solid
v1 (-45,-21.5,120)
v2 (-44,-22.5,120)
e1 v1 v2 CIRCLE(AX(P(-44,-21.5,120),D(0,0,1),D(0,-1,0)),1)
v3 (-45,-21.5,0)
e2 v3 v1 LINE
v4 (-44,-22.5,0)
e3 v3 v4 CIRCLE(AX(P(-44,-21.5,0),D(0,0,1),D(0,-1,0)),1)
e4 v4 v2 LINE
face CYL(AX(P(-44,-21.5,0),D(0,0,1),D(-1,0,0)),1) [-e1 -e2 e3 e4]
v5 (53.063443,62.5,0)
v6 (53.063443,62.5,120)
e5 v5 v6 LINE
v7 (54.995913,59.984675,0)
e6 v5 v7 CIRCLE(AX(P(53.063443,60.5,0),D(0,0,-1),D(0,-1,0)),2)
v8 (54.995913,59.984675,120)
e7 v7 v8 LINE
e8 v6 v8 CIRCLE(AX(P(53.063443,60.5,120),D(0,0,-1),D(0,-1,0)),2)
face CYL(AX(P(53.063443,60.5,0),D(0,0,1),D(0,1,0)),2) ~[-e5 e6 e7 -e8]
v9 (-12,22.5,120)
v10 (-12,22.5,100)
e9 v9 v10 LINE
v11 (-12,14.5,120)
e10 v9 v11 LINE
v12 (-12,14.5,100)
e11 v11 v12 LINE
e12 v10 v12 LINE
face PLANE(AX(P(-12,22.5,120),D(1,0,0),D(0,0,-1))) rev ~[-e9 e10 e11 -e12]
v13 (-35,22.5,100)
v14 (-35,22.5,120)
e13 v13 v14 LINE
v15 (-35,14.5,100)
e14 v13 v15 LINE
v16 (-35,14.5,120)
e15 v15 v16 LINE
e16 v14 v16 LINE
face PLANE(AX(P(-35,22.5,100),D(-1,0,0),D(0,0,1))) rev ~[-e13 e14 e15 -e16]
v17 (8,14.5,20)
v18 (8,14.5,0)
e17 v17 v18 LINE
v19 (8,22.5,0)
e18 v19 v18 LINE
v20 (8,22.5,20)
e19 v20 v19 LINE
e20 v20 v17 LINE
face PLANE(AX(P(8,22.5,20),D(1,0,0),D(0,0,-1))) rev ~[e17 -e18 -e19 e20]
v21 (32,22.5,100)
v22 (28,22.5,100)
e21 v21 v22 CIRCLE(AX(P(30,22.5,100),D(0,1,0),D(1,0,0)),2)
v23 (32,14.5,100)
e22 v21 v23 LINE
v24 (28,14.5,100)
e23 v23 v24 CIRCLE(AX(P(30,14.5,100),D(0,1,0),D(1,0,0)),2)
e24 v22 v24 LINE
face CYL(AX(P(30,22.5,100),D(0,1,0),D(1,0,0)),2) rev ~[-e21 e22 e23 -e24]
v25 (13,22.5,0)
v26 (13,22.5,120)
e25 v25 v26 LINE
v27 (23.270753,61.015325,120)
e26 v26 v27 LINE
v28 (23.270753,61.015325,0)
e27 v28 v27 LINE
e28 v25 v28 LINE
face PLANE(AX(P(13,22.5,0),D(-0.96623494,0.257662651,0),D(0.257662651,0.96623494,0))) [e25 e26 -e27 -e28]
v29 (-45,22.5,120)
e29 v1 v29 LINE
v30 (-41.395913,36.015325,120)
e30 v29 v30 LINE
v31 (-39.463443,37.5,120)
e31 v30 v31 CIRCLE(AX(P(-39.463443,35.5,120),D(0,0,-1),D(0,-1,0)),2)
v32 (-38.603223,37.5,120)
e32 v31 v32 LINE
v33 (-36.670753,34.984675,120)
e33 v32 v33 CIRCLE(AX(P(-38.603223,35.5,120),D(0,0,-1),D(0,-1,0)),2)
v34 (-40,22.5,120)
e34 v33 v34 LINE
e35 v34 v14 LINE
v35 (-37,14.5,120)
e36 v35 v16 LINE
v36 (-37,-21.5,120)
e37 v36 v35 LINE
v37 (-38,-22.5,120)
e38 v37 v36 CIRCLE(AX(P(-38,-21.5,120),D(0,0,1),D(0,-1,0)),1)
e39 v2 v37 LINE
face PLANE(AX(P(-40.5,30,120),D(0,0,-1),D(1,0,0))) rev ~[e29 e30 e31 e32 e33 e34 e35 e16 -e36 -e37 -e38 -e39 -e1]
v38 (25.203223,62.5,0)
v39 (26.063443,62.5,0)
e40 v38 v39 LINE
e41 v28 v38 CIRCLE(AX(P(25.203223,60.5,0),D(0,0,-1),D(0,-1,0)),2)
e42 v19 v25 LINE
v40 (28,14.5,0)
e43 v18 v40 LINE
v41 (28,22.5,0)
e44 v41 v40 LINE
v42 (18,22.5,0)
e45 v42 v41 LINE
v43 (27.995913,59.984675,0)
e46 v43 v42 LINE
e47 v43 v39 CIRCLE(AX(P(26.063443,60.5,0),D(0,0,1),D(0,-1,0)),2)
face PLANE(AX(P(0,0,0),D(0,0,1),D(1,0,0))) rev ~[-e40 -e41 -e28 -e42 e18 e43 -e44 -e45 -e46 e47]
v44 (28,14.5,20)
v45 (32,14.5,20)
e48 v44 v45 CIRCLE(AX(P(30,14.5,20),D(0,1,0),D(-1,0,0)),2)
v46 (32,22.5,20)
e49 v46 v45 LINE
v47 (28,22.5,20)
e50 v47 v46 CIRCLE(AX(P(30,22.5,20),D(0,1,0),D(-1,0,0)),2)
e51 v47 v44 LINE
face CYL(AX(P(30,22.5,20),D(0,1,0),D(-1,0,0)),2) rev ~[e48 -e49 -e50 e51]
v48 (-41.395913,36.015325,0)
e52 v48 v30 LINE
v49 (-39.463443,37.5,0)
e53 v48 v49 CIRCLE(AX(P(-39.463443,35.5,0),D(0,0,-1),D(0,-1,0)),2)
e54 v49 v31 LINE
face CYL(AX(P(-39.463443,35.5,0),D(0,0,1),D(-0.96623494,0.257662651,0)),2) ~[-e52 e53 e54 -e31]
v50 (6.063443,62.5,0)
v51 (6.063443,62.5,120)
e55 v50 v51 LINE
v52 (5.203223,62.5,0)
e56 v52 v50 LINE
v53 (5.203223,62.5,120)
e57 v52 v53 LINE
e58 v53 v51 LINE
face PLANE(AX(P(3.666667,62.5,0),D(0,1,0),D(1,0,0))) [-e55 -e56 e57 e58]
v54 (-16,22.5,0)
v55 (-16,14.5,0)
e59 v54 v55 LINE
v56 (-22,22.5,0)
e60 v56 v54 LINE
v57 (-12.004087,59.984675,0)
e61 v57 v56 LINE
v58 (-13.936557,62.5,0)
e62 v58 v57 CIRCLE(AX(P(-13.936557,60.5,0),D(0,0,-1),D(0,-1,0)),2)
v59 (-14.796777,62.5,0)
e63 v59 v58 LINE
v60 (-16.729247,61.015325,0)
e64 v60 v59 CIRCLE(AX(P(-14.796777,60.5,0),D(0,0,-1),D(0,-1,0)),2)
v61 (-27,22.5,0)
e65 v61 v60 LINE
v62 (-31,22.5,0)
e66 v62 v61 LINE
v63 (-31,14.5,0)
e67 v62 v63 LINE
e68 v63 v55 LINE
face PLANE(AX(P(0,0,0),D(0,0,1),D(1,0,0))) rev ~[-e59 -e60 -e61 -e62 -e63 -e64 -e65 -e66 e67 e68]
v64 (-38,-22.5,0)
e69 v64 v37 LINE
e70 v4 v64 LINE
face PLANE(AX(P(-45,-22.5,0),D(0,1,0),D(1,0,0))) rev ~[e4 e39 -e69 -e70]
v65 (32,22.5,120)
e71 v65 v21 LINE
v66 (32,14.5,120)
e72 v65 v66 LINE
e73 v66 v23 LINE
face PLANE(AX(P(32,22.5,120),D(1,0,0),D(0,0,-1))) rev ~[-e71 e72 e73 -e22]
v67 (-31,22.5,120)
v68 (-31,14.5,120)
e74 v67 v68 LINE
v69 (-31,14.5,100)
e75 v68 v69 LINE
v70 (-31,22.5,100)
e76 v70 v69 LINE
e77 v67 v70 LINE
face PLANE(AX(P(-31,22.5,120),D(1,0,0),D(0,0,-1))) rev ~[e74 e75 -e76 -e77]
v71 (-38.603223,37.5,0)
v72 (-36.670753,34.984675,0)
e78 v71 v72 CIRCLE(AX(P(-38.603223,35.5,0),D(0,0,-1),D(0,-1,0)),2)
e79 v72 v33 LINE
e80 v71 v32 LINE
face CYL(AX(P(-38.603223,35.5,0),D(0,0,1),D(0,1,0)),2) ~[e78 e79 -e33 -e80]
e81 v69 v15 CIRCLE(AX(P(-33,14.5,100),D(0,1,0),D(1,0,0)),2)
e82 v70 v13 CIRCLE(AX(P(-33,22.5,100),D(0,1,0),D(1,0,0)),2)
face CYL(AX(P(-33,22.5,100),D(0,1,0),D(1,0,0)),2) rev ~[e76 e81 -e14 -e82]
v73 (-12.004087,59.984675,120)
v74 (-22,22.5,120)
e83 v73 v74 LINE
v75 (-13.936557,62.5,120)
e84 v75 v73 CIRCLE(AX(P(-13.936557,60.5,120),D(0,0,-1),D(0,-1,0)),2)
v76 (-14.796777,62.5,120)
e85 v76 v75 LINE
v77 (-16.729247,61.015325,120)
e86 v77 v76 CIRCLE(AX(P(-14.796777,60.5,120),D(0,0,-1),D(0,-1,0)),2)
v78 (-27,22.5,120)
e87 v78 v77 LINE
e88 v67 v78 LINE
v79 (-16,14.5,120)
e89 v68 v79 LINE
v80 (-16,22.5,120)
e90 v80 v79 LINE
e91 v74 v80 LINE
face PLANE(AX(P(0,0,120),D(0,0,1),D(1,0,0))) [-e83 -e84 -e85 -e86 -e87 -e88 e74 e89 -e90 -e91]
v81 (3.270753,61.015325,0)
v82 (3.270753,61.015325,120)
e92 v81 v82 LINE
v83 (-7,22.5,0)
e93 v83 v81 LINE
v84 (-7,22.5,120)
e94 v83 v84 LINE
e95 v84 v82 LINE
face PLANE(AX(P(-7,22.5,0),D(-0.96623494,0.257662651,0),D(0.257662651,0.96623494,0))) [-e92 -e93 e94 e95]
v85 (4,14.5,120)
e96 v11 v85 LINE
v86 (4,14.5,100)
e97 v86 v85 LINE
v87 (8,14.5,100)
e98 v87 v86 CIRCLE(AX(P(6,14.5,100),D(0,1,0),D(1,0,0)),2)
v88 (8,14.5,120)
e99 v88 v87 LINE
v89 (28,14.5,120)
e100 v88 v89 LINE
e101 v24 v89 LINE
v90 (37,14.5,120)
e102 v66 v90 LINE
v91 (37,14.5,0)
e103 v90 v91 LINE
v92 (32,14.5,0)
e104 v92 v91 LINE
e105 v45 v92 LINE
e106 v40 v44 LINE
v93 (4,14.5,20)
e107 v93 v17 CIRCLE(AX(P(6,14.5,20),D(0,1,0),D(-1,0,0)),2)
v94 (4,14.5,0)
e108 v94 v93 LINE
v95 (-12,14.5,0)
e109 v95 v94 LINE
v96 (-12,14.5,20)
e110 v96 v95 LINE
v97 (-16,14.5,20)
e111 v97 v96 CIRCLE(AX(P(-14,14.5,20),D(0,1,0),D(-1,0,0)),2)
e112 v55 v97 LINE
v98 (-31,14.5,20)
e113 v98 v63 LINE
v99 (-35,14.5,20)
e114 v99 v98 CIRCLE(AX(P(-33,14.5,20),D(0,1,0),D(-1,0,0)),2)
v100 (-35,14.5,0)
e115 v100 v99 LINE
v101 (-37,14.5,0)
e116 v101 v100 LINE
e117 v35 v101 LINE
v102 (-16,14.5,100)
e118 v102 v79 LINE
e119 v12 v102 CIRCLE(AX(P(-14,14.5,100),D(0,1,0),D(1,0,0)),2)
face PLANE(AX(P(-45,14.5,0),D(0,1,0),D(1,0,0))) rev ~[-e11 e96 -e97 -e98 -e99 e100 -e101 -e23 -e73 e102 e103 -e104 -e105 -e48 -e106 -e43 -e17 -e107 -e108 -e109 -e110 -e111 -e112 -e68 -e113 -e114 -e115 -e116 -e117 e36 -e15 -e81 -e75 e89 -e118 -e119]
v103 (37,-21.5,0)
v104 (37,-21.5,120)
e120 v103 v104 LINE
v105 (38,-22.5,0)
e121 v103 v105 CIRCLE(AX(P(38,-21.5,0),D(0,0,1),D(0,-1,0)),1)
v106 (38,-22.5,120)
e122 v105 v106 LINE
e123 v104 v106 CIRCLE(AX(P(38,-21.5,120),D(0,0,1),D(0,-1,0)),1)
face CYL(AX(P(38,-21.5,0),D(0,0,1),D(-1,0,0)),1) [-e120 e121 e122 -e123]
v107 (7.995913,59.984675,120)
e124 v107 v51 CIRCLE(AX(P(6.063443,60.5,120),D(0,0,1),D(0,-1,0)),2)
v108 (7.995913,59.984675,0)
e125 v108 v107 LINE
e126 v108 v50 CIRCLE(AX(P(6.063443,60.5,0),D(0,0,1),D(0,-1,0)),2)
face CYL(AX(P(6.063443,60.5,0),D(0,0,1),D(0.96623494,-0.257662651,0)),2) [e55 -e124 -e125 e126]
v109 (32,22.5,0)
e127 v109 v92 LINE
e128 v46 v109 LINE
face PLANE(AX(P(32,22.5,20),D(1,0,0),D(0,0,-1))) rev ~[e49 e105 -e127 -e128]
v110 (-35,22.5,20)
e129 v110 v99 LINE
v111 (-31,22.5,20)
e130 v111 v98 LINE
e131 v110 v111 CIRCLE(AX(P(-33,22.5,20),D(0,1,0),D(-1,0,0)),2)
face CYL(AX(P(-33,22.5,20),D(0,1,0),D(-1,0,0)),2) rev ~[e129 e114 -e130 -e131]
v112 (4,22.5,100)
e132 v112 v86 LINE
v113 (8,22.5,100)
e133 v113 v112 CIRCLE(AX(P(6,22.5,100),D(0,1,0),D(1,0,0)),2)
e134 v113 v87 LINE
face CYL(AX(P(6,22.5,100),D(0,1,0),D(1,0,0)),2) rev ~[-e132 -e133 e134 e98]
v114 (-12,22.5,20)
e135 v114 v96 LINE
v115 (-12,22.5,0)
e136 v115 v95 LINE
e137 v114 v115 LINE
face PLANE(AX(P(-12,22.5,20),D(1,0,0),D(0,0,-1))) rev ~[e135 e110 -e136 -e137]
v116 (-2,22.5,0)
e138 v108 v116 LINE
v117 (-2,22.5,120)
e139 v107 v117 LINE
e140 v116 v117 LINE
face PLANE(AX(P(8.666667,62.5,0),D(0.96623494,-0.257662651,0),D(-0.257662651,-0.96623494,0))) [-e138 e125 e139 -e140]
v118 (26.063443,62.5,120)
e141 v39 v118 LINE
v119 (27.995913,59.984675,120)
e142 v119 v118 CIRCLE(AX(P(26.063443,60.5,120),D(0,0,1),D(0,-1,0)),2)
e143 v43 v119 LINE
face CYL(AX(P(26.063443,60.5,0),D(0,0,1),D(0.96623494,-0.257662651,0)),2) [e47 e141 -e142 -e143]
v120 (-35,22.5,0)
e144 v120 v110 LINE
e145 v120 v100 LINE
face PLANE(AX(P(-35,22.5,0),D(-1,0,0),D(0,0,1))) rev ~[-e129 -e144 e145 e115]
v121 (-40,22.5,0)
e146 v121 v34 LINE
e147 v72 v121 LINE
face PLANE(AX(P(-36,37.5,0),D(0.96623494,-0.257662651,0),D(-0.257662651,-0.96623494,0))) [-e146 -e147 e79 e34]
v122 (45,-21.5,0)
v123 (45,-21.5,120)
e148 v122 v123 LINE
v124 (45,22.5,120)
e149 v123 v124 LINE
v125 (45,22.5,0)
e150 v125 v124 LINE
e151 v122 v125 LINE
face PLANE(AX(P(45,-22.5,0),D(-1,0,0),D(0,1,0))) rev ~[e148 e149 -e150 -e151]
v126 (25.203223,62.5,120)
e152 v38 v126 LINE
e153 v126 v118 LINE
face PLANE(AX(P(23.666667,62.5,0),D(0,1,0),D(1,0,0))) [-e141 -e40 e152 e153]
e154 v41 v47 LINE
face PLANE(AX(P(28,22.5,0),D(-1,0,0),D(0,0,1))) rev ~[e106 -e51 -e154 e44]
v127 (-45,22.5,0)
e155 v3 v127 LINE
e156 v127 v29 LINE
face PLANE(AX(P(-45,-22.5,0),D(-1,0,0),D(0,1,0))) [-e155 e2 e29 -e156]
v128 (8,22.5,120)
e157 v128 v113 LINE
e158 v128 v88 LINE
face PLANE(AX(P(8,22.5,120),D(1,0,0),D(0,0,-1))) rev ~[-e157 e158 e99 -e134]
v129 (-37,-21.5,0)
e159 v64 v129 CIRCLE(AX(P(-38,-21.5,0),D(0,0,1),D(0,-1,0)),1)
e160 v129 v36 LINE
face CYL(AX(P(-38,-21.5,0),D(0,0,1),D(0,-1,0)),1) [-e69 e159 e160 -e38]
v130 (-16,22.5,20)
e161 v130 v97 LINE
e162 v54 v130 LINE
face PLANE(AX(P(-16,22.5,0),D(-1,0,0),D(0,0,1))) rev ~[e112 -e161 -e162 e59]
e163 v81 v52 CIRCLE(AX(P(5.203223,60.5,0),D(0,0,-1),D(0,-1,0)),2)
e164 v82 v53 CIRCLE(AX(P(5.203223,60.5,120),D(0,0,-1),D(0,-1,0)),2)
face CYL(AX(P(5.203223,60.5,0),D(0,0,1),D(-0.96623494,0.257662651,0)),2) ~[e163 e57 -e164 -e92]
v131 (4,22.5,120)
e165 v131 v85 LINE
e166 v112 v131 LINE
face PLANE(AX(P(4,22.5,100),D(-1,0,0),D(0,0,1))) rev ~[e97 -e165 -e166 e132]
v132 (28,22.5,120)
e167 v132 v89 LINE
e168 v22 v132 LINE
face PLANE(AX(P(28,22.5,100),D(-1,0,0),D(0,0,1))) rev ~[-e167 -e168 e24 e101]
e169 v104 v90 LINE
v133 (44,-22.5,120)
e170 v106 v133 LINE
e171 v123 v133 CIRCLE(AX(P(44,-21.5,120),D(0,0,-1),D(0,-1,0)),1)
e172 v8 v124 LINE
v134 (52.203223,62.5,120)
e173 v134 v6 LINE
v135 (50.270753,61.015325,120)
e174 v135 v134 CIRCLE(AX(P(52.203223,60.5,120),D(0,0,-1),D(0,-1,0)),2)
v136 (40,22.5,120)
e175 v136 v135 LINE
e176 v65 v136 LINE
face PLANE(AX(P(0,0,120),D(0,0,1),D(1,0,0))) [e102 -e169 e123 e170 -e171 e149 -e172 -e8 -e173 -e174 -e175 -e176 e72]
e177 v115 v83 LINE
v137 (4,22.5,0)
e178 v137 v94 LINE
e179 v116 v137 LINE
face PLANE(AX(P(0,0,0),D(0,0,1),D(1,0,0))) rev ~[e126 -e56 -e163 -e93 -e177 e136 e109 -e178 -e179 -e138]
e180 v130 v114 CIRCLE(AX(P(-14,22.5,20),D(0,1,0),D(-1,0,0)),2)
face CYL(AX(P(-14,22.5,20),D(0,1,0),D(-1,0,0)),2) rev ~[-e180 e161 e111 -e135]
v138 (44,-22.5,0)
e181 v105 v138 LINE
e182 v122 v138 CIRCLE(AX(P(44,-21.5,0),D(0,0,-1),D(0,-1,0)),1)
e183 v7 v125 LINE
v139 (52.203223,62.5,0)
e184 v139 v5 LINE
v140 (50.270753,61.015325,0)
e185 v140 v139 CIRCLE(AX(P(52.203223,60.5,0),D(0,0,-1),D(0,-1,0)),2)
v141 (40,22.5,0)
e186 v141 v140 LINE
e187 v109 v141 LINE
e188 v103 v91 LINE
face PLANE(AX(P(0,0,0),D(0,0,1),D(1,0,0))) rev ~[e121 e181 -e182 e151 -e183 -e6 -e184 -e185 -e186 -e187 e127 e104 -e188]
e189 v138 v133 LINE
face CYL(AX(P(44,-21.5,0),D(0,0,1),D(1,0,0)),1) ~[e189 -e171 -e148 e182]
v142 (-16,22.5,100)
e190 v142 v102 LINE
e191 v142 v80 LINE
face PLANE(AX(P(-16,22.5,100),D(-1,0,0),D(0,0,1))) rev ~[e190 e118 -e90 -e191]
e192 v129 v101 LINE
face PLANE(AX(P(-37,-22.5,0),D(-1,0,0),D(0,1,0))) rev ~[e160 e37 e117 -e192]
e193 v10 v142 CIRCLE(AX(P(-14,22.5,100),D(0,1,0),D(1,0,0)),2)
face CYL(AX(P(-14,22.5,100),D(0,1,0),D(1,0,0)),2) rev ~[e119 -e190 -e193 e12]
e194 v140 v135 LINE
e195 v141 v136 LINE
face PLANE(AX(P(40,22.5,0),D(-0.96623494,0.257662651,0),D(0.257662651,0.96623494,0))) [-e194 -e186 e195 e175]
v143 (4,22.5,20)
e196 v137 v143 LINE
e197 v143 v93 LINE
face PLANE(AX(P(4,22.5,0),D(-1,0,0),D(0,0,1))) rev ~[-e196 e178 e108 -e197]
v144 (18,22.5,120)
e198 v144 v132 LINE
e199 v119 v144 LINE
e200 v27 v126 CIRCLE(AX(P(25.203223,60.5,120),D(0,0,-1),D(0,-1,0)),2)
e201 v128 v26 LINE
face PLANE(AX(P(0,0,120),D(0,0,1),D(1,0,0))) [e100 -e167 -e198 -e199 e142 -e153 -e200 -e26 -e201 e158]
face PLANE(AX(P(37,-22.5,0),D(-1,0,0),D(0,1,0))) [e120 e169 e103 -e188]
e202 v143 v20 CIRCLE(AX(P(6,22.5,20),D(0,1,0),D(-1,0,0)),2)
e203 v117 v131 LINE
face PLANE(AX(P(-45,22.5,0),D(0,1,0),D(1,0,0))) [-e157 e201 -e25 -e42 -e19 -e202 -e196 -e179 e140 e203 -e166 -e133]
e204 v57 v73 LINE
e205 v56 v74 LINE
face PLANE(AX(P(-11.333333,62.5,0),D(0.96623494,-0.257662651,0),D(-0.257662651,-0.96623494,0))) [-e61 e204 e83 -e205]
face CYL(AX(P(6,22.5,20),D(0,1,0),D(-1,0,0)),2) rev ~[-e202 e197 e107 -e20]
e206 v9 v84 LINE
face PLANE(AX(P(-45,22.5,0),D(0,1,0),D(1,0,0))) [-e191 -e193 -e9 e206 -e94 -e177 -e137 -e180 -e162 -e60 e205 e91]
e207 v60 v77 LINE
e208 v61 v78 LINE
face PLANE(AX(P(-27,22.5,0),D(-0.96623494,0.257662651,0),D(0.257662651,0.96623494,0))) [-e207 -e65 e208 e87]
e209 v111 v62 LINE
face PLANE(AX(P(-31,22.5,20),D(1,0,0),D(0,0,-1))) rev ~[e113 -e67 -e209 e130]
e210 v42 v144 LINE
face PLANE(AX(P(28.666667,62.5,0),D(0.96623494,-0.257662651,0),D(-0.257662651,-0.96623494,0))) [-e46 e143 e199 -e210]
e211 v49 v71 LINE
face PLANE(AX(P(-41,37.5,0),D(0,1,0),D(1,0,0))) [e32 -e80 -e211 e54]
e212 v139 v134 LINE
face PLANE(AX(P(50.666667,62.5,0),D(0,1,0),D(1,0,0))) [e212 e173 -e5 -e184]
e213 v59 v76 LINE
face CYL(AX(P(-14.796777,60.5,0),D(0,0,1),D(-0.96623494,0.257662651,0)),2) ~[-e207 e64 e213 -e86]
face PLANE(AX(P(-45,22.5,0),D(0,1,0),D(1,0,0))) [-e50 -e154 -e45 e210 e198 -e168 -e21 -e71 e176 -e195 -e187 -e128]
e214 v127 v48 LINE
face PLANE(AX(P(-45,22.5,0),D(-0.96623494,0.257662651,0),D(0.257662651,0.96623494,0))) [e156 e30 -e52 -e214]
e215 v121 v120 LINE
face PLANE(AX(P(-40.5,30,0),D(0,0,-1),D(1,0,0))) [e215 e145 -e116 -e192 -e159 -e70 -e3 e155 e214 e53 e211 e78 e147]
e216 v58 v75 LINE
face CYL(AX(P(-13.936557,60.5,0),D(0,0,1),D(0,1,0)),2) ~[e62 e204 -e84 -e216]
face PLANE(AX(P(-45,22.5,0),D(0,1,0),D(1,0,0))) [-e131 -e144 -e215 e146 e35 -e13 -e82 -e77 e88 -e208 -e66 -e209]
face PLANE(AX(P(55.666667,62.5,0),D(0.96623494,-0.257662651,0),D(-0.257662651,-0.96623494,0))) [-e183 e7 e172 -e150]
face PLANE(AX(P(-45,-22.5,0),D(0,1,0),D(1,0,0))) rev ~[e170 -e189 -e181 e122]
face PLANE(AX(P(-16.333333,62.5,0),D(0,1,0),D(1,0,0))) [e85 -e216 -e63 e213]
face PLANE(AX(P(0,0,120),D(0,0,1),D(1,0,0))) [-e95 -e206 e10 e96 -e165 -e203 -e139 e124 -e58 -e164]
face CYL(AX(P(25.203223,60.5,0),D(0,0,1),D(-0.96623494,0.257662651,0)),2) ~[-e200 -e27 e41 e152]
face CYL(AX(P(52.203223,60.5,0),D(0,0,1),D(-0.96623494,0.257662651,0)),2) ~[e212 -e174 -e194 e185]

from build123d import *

# Parameters (mm, degrees)
F0_W     = 90
F0_H     = 45
F1_DEPTH = 120
F2_T     = -8
F4_DEPTH = 8
F6_DEPTH = 120
F7_R     = 2
F8_R     = 1


# Not quite as in the source:
# - a feature names something its author has since deleted; it is built from what else it names


with BuildPart() as f1:
    # F0 (on Top) → F1 (new body)
    with BuildSketch(Plane.XY):
        Rectangle(F0_W, F0_H)
    extrude(amount=F1_DEPTH)

    # F2
    f2_openings = [f1.faces().sort_by_distance(p)[0] for p in [
        (0, 0, 120),
        (0, -22.5, 60),
        (0, 0, 0),
    ]]
    offset(amount=F2_T, openings=f2_openings)

    # F3 (on face) → F4 (cut, through all)
    with BuildSketch(Plane(origin=(0, 22.5, 0), x_dir=(-1, 0, 0), z_dir=(0, 1, 0))):
        with BuildLine():
            Line((-32, 20), (-32, 0))
            Line((-32, 0), (-28, 0))
            Line((-28, 0), (-28, 20))
            ThreePointArc((-28, 20), (-30, 22), (-32, 20))
        make_face()
        with BuildLine():
            Line((-8, 20), (-8, 0))
            Line((-8, 0), (-4, 0))
            Line((-4, 0), (-4, 20))
            ThreePointArc((-4, 20), (-6, 22), (-8, 20))
        make_face()
        with BuildLine():
            Line((12, 20), (12, 0))
            Line((12, 0), (16, 0))
            Line((16, 0), (16, 20))
            ThreePointArc((16, 20), (14, 22), (12, 20))
        make_face()
        with BuildLine():
            Line((31, 20), (31, 0))
            Line((31, 0), (35, 0))
            Line((35, 0), (35, 20))
            ThreePointArc((35, 20), (33, 22), (31, 20))
        make_face()
        with BuildLine():
            Line((35, 120), (31, 120))
            Line((31, 120), (31, 100))
            ThreePointArc((31, 100), (33, 98), (35, 100))
            Line((35, 100), (35, 120))
        make_face()
        with BuildLine():
            Line((16, 120), (12, 120))
            Line((12, 120), (12, 100))
            ThreePointArc((12, 100), (14, 98), (16, 100))
            Line((16, 100), (16, 120))
        make_face()
        with BuildLine():
            Line((-4, 120), (-8, 120))
            Line((-8, 120), (-8, 100))
            ThreePointArc((-8, 100), (-6, 98), (-4, 100))
            Line((-4, 100), (-4, 120))
        make_face()
        with BuildLine():
            Line((-28, 120), (-32, 120))
            Line((-32, 120), (-32, 100))
            ThreePointArc((-32, 100), (-30, 98), (-28, 100))
            Line((-28, 100), (-28, 120))
        make_face()
    extrude(amount=-F4_DEPTH, mode=Mode.SUBTRACT)

    # F5 (on face) → F6 (join, through all)
    with BuildSketch(Plane(origin=(0, 0, 0), x_dir=(1, 0, 0), z_dir=(0, 0, -1))):
        Polygon((-40, -22.5), (-45, -22.5), (-41, -37.5), (-36, -37.5), align=None)
        Polygon((-22, -22.5), (-27, -22.5), (-16.3333333333, -62.5), (-11.3333333333, -62.5), align=None)
        Polygon((8.6666666667, -62.5), (-2, -22.5), (-7, -22.5), (3.6666666667, -62.5), align=None)
        Polygon((28.6666666667, -62.5), (18, -22.5), (13, -22.5), (23.6666666667, -62.5), align=None)
        Polygon((45, -22.5), (40, -22.5), (50.6666666667, -62.5), (55.6666666667, -62.5), align=None)
    extrude(amount=-F6_DEPTH)

    # F7
    f7_edges = [f1.edges().sort_by_distance(p)[0] for p in [
        (55.666667, 62.5, 60),
        (50.666667, 62.5, 60),
        (-16.333333, 62.5, 60),
        (3.666667, 62.5, 60),
        (-11.333333, 62.5, 60),
        (-36, 37.5, 60),
        (-41, 37.5, 60),
        (23.666667, 62.5, 60),
        (28.666667, 62.5, 60),
        (8.666667, 62.5, 60),
    ]]
    fillet(f7_edges, radius=F7_R)

    # F8
    f8_edges = [f1.edges().sort_by_distance(p)[0] for p in [
        (-45, -22.5, 60),
        (-37, -22.5, 60),
        (37, -22.5, 60),
        (45, -22.5, 60),
    ]]
    fillet(f8_edges, radius=F8_R)


solid = f1.part
